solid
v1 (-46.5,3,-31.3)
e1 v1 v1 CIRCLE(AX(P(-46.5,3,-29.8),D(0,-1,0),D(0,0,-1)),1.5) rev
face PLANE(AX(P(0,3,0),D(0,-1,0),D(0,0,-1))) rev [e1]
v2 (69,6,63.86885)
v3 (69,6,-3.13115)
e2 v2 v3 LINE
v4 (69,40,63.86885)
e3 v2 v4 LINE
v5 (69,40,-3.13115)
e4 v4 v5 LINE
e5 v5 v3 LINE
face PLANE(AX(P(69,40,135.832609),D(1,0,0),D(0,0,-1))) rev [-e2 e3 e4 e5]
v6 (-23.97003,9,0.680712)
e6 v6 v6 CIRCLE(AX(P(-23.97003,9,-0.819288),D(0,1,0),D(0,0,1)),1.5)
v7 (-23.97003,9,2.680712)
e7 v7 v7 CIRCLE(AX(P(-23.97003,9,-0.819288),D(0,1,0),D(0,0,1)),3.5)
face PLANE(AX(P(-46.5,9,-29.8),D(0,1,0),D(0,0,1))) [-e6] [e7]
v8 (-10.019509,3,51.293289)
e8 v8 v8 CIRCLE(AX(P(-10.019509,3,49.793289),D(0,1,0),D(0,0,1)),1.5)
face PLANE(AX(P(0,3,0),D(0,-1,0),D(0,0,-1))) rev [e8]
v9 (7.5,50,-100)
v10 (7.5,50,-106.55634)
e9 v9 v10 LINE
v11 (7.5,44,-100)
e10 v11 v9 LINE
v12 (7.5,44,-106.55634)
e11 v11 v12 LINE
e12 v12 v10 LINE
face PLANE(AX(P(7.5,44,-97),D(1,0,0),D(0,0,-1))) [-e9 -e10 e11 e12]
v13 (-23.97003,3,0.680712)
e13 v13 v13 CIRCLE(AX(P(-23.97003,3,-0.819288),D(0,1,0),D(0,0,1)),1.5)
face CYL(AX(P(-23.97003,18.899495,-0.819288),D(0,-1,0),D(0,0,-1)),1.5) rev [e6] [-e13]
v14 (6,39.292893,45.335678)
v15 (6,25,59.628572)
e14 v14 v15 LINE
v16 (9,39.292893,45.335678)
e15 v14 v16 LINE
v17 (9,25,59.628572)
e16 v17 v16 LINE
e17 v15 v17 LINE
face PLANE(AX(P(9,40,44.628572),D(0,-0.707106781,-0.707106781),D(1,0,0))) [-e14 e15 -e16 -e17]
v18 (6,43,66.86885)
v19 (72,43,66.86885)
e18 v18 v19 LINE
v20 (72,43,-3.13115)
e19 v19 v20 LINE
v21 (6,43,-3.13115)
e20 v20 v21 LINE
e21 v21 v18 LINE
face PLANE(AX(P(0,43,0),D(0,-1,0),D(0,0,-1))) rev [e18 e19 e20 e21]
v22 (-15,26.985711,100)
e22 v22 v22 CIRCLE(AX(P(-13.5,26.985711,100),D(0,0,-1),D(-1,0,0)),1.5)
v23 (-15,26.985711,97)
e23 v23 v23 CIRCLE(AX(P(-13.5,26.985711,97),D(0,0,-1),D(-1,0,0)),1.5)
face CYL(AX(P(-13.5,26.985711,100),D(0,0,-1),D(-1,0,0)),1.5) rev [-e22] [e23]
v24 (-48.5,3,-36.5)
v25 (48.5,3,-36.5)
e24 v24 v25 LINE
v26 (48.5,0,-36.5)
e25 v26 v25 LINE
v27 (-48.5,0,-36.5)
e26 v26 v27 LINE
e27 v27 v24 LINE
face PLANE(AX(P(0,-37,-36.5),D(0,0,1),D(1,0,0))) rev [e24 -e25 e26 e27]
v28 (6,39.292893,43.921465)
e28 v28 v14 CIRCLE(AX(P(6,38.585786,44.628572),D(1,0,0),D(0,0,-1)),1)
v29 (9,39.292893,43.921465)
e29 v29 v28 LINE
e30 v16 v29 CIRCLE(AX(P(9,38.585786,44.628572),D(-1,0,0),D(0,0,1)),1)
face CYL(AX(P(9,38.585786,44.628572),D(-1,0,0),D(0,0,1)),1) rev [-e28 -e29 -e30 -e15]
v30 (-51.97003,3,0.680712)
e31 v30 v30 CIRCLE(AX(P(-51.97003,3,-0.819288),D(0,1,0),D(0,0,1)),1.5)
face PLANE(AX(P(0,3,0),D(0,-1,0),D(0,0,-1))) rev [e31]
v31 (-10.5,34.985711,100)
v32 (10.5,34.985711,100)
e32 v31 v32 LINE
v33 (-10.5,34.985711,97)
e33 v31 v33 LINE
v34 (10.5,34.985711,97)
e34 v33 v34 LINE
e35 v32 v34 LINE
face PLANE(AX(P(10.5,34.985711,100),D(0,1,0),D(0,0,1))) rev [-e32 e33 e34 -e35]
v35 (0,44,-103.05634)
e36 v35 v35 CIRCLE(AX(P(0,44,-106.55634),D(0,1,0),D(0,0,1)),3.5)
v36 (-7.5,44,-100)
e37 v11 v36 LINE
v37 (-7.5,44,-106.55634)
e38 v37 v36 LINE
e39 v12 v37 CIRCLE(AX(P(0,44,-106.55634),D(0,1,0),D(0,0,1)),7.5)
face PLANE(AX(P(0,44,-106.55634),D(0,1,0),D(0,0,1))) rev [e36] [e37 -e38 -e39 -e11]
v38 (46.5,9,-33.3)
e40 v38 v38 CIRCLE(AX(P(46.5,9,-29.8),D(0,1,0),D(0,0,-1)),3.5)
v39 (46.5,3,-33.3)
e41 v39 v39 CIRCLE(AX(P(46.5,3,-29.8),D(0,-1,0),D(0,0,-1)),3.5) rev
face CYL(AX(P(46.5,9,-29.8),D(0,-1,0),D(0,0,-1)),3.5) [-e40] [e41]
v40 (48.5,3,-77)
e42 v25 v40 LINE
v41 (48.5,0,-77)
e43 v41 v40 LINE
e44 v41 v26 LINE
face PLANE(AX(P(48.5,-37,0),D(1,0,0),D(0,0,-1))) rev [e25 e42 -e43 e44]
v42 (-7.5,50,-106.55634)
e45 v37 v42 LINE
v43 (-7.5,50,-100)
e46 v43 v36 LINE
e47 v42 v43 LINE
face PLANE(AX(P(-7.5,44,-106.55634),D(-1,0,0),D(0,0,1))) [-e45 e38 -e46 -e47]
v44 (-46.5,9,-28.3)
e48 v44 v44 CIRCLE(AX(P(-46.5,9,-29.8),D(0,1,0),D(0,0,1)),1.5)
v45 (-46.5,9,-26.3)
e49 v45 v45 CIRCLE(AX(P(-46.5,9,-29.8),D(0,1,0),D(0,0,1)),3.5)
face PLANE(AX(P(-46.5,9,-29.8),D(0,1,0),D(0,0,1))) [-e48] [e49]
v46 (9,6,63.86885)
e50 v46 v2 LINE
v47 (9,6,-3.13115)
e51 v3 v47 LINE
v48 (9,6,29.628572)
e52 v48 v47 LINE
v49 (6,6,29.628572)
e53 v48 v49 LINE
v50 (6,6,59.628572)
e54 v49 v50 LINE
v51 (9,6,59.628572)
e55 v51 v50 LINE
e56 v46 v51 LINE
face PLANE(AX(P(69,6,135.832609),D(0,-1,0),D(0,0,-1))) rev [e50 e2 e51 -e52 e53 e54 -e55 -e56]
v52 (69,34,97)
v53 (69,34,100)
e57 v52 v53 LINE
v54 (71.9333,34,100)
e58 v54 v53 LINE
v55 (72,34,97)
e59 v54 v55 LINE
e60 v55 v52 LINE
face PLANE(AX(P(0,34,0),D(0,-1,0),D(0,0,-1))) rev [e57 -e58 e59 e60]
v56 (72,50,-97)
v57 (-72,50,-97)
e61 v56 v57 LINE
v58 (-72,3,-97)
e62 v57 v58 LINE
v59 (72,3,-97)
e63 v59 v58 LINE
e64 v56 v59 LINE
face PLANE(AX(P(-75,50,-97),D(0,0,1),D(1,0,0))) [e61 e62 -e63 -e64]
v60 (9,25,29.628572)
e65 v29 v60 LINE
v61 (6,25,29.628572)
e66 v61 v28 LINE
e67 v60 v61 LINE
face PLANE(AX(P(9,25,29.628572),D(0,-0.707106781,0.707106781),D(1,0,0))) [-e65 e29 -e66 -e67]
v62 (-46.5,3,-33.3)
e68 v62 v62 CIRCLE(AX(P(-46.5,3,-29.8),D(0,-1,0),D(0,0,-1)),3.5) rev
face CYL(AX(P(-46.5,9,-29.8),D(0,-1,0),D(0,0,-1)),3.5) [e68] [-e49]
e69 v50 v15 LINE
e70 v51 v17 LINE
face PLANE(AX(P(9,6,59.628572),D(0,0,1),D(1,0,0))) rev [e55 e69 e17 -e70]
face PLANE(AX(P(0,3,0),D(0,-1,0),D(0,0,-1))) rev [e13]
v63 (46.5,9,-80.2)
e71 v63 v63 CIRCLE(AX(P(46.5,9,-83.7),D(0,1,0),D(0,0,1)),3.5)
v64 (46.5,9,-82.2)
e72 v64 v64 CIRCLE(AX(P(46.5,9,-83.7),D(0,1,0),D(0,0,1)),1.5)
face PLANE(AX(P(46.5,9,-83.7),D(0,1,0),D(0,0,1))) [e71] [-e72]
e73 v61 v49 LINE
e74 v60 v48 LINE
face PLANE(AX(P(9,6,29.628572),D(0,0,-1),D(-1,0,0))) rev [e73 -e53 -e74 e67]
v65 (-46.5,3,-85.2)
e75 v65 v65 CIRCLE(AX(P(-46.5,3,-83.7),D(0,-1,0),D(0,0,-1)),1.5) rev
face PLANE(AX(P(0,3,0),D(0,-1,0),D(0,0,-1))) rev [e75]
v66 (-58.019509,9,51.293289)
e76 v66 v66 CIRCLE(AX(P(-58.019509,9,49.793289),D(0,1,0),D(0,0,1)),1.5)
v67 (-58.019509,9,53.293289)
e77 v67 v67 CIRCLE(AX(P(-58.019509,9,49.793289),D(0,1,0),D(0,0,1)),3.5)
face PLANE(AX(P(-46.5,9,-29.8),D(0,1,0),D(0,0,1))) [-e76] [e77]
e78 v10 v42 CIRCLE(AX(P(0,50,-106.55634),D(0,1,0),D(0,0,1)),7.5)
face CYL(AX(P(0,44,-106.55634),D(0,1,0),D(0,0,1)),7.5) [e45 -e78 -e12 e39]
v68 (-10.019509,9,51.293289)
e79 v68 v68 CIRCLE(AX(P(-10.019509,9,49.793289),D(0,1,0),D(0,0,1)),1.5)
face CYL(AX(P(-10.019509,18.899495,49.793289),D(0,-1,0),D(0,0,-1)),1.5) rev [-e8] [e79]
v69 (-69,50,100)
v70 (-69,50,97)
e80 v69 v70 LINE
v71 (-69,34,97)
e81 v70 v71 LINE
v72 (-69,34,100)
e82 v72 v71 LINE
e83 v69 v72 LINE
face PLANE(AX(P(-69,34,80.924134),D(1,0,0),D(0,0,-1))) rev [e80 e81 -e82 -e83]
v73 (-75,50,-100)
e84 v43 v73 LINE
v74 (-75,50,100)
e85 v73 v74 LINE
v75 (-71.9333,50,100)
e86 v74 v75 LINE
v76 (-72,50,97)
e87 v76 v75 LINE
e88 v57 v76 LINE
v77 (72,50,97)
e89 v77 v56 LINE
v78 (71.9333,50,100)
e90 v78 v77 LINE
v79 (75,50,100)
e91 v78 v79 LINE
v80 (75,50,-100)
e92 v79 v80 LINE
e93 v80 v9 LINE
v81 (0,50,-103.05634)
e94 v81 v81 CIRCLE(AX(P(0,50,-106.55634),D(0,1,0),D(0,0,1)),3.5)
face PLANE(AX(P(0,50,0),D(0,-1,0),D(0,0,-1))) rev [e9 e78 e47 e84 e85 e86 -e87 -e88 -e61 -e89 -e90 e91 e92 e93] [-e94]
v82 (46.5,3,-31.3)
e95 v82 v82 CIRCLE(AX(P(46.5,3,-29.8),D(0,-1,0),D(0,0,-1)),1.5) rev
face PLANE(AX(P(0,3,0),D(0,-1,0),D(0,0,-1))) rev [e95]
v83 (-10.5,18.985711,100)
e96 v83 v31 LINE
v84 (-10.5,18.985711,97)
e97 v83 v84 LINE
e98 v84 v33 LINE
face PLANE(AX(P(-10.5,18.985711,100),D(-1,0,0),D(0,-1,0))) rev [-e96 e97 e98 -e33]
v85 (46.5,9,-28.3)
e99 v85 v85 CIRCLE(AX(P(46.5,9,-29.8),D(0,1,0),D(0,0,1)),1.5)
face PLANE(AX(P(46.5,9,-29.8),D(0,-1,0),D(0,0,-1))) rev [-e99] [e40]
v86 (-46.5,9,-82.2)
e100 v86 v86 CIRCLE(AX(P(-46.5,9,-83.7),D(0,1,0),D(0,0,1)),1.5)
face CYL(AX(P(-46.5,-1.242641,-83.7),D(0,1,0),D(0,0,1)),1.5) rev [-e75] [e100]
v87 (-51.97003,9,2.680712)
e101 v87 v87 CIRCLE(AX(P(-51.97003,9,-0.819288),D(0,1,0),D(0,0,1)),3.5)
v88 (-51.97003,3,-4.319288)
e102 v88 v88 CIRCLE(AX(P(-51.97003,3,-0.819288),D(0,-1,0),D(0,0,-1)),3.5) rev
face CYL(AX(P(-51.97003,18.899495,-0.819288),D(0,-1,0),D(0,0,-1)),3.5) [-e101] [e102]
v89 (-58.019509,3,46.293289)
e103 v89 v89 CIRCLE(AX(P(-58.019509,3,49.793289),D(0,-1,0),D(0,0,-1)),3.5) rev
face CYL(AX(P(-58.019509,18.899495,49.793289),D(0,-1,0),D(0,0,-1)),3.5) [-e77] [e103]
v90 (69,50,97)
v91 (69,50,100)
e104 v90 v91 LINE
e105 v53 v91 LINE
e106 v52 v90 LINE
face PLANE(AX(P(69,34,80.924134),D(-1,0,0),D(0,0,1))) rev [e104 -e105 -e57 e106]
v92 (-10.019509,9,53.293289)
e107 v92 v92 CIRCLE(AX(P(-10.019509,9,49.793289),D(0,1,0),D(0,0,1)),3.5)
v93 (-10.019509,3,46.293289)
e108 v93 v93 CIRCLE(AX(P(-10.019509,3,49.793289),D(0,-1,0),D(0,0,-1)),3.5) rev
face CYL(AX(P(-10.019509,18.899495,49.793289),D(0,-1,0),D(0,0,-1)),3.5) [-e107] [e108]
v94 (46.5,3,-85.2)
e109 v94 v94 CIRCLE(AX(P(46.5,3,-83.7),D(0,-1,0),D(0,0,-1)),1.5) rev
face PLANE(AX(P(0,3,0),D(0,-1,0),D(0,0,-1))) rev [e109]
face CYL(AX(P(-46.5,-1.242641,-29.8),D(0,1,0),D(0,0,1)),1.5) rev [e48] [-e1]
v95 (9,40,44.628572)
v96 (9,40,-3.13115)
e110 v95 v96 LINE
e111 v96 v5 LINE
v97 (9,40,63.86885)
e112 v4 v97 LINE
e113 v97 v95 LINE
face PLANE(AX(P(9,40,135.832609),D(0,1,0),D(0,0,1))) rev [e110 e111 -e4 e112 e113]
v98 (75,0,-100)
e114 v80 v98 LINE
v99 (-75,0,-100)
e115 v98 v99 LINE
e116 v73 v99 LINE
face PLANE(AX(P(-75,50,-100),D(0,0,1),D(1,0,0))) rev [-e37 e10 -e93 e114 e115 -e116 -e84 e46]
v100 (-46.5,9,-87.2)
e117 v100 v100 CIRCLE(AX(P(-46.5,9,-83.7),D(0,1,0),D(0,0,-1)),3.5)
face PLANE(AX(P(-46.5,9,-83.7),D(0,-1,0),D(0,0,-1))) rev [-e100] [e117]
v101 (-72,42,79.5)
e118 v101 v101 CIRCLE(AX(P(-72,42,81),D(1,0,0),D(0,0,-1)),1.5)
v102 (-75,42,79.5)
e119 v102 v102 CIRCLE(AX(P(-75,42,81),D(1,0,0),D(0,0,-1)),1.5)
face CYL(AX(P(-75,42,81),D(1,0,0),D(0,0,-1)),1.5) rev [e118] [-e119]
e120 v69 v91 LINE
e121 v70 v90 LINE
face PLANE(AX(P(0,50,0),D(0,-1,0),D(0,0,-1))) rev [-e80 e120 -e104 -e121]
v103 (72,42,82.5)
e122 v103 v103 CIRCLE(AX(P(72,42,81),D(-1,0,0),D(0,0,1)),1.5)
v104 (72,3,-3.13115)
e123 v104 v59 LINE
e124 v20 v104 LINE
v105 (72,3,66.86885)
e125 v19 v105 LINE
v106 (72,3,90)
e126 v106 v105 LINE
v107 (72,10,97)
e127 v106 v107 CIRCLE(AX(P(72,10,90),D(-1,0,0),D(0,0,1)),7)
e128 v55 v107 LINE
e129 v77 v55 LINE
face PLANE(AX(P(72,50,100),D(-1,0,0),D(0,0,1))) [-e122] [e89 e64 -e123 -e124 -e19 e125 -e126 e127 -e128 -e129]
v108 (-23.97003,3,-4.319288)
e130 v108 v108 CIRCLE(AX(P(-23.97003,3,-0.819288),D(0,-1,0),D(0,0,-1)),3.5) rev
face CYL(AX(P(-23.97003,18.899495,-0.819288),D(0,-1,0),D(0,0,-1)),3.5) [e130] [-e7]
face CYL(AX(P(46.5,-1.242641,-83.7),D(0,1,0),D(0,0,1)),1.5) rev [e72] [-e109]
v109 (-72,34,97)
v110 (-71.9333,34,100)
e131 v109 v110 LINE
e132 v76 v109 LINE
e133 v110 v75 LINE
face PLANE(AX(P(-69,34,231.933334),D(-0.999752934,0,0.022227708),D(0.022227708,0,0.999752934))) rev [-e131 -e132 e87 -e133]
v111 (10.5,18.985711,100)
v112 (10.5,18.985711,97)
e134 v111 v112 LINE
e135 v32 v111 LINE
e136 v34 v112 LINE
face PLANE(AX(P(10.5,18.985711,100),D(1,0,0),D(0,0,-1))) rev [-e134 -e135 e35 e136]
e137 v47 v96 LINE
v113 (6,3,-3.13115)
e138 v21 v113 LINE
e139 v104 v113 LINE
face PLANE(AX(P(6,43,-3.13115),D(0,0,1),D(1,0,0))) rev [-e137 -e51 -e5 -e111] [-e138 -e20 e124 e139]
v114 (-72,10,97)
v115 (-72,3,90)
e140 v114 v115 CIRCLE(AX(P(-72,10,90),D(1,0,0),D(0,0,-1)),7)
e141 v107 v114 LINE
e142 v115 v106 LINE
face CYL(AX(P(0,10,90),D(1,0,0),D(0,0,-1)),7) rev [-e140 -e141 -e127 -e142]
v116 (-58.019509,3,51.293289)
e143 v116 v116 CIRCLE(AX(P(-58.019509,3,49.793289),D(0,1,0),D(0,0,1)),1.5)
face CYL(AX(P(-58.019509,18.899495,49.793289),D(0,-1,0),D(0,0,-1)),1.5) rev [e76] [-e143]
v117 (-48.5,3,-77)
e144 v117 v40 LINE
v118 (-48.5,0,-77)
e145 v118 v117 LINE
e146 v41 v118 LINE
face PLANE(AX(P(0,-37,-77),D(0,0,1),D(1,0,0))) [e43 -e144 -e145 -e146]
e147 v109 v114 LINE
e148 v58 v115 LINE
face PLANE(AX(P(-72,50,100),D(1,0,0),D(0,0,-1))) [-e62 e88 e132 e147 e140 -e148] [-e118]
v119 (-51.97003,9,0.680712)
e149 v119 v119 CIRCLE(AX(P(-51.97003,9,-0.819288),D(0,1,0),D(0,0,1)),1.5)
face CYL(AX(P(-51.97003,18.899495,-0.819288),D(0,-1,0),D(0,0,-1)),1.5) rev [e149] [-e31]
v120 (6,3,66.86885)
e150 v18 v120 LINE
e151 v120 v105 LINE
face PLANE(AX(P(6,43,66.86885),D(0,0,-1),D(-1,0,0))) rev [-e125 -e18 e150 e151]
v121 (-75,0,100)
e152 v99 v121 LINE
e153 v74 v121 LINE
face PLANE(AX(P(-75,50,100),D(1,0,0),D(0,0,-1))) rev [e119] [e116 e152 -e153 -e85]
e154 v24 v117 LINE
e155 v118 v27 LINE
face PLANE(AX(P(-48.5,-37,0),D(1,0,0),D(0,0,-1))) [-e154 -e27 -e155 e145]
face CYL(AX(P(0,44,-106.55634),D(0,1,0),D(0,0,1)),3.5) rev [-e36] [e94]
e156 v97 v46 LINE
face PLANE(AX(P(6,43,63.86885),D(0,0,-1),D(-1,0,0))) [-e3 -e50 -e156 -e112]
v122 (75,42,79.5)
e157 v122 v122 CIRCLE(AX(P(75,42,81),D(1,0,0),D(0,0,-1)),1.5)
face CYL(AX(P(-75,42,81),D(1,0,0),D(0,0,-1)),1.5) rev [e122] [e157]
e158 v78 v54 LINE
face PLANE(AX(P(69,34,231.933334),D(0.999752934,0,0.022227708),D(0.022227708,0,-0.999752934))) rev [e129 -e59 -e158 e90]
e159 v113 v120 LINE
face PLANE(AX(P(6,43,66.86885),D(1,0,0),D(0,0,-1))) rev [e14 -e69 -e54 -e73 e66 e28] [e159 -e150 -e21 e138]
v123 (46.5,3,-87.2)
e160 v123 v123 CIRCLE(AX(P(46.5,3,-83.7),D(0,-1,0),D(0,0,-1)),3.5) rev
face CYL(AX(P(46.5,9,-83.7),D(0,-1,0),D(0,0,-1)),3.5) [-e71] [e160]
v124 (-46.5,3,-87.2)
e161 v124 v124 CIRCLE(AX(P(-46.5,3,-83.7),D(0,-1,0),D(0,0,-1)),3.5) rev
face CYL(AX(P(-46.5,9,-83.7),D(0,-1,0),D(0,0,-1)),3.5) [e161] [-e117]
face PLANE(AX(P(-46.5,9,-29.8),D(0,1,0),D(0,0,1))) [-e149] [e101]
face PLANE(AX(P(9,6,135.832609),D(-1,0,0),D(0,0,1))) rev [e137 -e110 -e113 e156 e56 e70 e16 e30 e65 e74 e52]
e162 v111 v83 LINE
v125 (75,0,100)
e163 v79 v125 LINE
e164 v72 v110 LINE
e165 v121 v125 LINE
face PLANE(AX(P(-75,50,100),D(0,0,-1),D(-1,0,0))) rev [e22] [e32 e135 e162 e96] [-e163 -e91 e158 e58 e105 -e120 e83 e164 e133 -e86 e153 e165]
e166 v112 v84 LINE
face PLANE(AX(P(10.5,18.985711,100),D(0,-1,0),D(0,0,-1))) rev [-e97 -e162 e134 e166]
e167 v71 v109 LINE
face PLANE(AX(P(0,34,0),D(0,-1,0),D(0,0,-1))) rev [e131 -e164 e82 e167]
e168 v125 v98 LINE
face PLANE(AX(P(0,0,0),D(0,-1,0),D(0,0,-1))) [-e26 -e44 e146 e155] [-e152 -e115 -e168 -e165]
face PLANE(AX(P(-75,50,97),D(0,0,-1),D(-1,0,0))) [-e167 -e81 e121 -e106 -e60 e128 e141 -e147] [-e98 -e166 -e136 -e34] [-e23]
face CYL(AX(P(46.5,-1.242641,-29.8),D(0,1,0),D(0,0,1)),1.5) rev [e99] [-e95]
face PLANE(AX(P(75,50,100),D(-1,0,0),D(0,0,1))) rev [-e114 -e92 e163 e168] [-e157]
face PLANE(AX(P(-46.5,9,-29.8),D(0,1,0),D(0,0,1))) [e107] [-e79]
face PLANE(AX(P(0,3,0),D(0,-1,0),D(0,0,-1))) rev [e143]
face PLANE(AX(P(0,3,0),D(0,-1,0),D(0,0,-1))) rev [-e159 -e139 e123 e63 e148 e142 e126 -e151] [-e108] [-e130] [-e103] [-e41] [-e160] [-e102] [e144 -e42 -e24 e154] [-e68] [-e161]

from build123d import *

# Parameters (mm, degrees)
SKETCH1_W               = 150
SKETCH1_H               = 200
BOSS_EXTRUDE1_DEPTH     = 50
SHELL1_T                = -3
SKETCH2_W               = 97
SKETCH2_H               = 40.5
CUT_EXTRUDE1_DEPTH      = 40
SKETCH4_R               = 3.5
BOSS_EXTRUDE2_DEPTH     = 6
SKETCH5_R               = 1.5
CUT_EXTRUDE2_DEPTH      = 6
CUT_EXTRUDE3_DEPTH      = 16
CUT_EXTRUDE4_DEPTH      = 185.686220385
CUT_EXTRUDE4_DEPTH_BACK = 185.686220385
SKETCH9_R               = 1.5
SKETCH11_R              = 1.5
SKETCH11_W              = 21
SKETCH11_H              = 16
CUT_EXTRUDE5_DEPTH      = 217.642562762
SKETCH13_R              = 3.5
BOSS_EXTRUDE5_DEPTH     = 6
FILLET1_R               = 7
SKETCH15_R              = 3.5
SKETCH15_R_2            = 1.5
BOSS_EXTRUDE6_DEPTH     = 6
SKETCH17_W              = 66
SKETCH17_H              = 70
BOSS_EXTRUDE7_DEPTH     = 40
SKETCH18_W              = 60
SKETCH18_H              = 34
CUT_EXTRUDE6_DEPTH      = 67
SKETCH19_W              = 30
SKETCH19_H              = 34
CUT_EXTRUDE7_DEPTH      = 3
CHAMFER1_SIZE           = 15
FILLET2_START           = 6
FILLET2_DEPTH           = 3


with BuildPart() as part:
    # Sketch1 → Boss-Extrude1 (new body)
    with BuildSketch(Plane(origin=(0, 0, 0), x_dir=(1, 0, 0), z_dir=(0, 1, 0))):
        Rectangle(SKETCH1_W, SKETCH1_H)
    extrude(amount=BOSS_EXTRUDE1_DEPTH)

    # Shell1
    shell1_openings = [part.faces().sort_by_distance(p)[0] for p in [
        (0, 50, 0),
    ]]
    offset(amount=SHELL1_T, openings=shell1_openings, kind=Kind.INTERSECTION)

    # Sketch2 → Cut-Extrude1 (cut)
    with BuildSketch(Plane(origin=(0, 3, 0), x_dir=(1, 0, 0), z_dir=(0, 1, 0))):
        with Locations((0, 56.75)):
            Rectangle(SKETCH2_W, SKETCH2_H)
    extrude(amount=-CUT_EXTRUDE1_DEPTH, mode=Mode.SUBTRACT)

    # Sketch4 → Boss-Extrude2 (add)
    with BuildSketch(Plane(origin=(0, 3, 0), x_dir=(1, 0, 0), z_dir=(0, 1, 0))):
        with Locations(Location((46.5, 83.7, 0), (0, 0, 90))):
            Circle(SKETCH4_R)
        with Locations(Location((-46.5, 83.7, 0), (0, 0, 90))):
            Circle(SKETCH4_R)
        with Locations(Location((46.5, 29.8, 0), (0, 0, 90))):
            Circle(SKETCH4_R)
        with Locations(Location((-46.5, 29.8, 0), (0, 0, 90))):
            Circle(SKETCH4_R)
    extrude(amount=BOSS_EXTRUDE2_DEPTH)

    # Sketch5 → Cut-Extrude2 (cut)
    with BuildSketch(Plane(origin=(0, 9, 0), x_dir=(1, 0, 0), z_dir=(0, 1, 0))):
        with Locations(Location((-46.5, 83.7, 0), (0, 0, 270))):
            Circle(SKETCH5_R)
        with Locations(Location((46.5, 83.7, 0), (0, 0, 270))):
            Circle(SKETCH5_R)
        with Locations(Location((-46.5, 29.8, 0), (0, 0, 270))):
            Circle(SKETCH5_R)
        with Locations(Location((46.5, 29.8, 0), (0, 0, 270))):
            Circle(SKETCH5_R)
    extrude(amount=-CUT_EXTRUDE2_DEPTH, mode=Mode.SUBTRACT)

    # Sketch7 → Cut-Extrude3 (cut)
    with BuildSketch(Plane(origin=(0, 50, 0), x_dir=(1, 0, 0), z_dir=(0, 1, 0))):
        Polygon((-72, -97), (-72, -80.924133637), (-69, -80.924133637), (-69, -231.933334159), align=None)
        Polygon((69, -231.933334159), (72, -97), (72, -80.924133637), (69, -80.924133637), align=None)
    extrude(amount=-CUT_EXTRUDE3_DEPTH, mode=Mode.SUBTRACT)

    # Sketch9 → Cut-Extrude4 (cut, two sides: drawn at the far end of the back side and taken through both)
    with BuildSketch(Plane(origin=(-72, 0, 0), x_dir=(0, 0, -1), z_dir=(1, 0, 0)).offset(-CUT_EXTRUDE4_DEPTH_BACK)):
        with Locations((-81, 42)):
            Circle(SKETCH9_R)
    extrude(amount=CUT_EXTRUDE4_DEPTH + CUT_EXTRUDE4_DEPTH_BACK, mode=Mode.SUBTRACT)

    # Sketch11 → Cut-Extrude5 (cut, through all)
    with BuildSketch(Plane(origin=(0, 0, 97), x_dir=(-1, 0, 0), z_dir=(0, 0, -1))):
        with Locations((13.5, 26.985710618)):
            Circle(SKETCH11_R)
        with Locations((0, 26.985710618)):
            Rectangle(SKETCH11_W, SKETCH11_H)
    extrude(amount=-CUT_EXTRUDE5_DEPTH, mode=Mode.SUBTRACT)

    # Sketch13 → Boss-Extrude5 (add)
    with BuildSketch(Plane(origin=(0, 50, 0), x_dir=(1, 0, 0), z_dir=(0, 1, 0))):
        with BuildLine():
            Line((-7.5, 106.556339799), (-7.5, 97))
            Line((-7.5, 97), (7.5, 97))
            Line((7.5, 97), (7.5, 106.556339799))
            ThreePointArc((7.5, 106.556339799), (0, 114.056339799), (-7.5, 106.556339799))
        make_face()
        with Locations(Location((0, 106.556339799, 0), (0, 0, 270))):
            Circle(SKETCH13_R, mode=Mode.SUBTRACT)
    extrude(amount=-BOSS_EXTRUDE5_DEPTH)

    # Fillet1
    fillet1_edges = [part.edges().sort_by_distance(p)[0] for p in [
        (0, 3, 97),
    ]]
    fillet(fillet1_edges, radius=FILLET1_R)

    # Sketch15 → Boss-Extrude6 (add)
    # profile 1 of 4: a face of its own
    with BuildSketch(Plane(origin=(0, 3, 0), x_dir=(1, 0, 0), z_dir=(0, 1, 0))):
        with Locations(Location((-58.019508849, -49.793289196, 0), (0, 0, 90))):
            Circle(SKETCH15_R)
        with Locations(Location((-58.019508849, -49.793289196, 0), (0, 0, 270))):
            Circle(SKETCH15_R_2, mode=Mode.SUBTRACT)
    # profile 2 of 4: a face of its own
    with BuildSketch(Plane(origin=(0, 3, 0), x_dir=(1, 0, 0), z_dir=(0, 1, 0))):
        with Locations(Location((-10.019508849, -49.793289196, 0), (0, 0, 90))):
            Circle(SKETCH15_R)
        with Locations(Location((-10.019508849, -49.793289196, 0), (0, 0, 270))):
            Circle(SKETCH15_R_2, mode=Mode.SUBTRACT)
    # profile 3 of 4: a face of its own
    with BuildSketch(Plane(origin=(0, 3, 0), x_dir=(1, 0, 0), z_dir=(0, 1, 0))):
        with Locations(Location((-23.970029682, 0.819287981, 0), (0, 0, 90))):
            Circle(SKETCH15_R)
        with Locations(Location((-23.970029682, 0.819287981, 0), (0, 0, 270))):
            Circle(SKETCH15_R_2, mode=Mode.SUBTRACT)
    # profile 4 of 4: a face of its own
    with BuildSketch(Plane(origin=(0, 3, 0), x_dir=(1, 0, 0), z_dir=(0, 1, 0))):
        with Locations(Location((-51.970029682, 0.819287981, 0), (0, 0, 90))):
            Circle(SKETCH15_R)
        with Locations(Location((-51.970029682, 0.819287981, 0), (0, 0, 270))):
            Circle(SKETCH15_R_2, mode=Mode.SUBTRACT)
    extrude(amount=BOSS_EXTRUDE6_DEPTH)

    # Sketch17 → Boss-Extrude7 (add)
    with BuildSketch(Plane(origin=(0, 3, 0), x_dir=(1, 0, 0), z_dir=(0, 1, 0))):
        with Locations((39, -31.868850241)):
            Rectangle(SKETCH17_W, SKETCH17_H)
    extrude(amount=BOSS_EXTRUDE7_DEPTH)

    # Sketch18 → Cut-Extrude6 (cut)
    with BuildSketch(Plane(origin=(0, 0, -3.131149759), x_dir=(-1, 0, 0), z_dir=(0, 0, -1))):
        with Locations((-39, 23)):
            Rectangle(SKETCH18_W, SKETCH18_H)
    extrude(amount=-CUT_EXTRUDE6_DEPTH, mode=Mode.SUBTRACT)

    # Sketch19 → Cut-Extrude7 (cut)
    with BuildSketch(Plane.ZY.offset(-6)):
        with Locations((44.62857151, 23)):
            Rectangle(SKETCH19_W, SKETCH19_H)
    extrude(amount=-CUT_EXTRUDE7_DEPTH, mode=Mode.SUBTRACT)

    # Chamfer1
    chamfer1_edges = [part.edges().sort_by_distance(p)[0] for p in [
        (7.5, 40, 59.62857151),
        (7.5, 40, 29.62857151),
    ]]
    chamfer(chamfer1_edges, length=CHAMFER1_SIZE - 0.0001)  # a hair under: the kernel refuses the full size


with BuildPart() as fillet2_tool:
    # Fillet2: read off the stored shape, not the designer's step
    # Fillet2 outline → Fillet2 (new body)
    with BuildSketch(Plane.YZ.offset(FILLET2_START)):
        with BuildLine():
            Line((38, 46.62857151), (39.292893219, 45.335678291))
            ThreePointArc((39.292893219, 45.335678291), (39.585786438, 44.628571509), (39.292893219, 43.921464728))
            Line((39.292893219, 43.921464728), (38, 42.628571509))
            Line((38, 42.628571509), (38, 42))
            Line((38, 42), (41, 42))
            Line((41, 42), (41, 47))
            Line((41, 47), (38, 47))
            Line((38, 47), (38, 46.62857151))
        make_face()
    extrude(amount=FILLET2_DEPTH)


with BuildPart() as part_1:
    add(part.part)


with BuildPart() as part_2:
    # Fillet2: joined with fillet2_tool
    add(part_1.part.fuse(fillet2_tool.part, tol=0.00001))


solid = part_2.part
